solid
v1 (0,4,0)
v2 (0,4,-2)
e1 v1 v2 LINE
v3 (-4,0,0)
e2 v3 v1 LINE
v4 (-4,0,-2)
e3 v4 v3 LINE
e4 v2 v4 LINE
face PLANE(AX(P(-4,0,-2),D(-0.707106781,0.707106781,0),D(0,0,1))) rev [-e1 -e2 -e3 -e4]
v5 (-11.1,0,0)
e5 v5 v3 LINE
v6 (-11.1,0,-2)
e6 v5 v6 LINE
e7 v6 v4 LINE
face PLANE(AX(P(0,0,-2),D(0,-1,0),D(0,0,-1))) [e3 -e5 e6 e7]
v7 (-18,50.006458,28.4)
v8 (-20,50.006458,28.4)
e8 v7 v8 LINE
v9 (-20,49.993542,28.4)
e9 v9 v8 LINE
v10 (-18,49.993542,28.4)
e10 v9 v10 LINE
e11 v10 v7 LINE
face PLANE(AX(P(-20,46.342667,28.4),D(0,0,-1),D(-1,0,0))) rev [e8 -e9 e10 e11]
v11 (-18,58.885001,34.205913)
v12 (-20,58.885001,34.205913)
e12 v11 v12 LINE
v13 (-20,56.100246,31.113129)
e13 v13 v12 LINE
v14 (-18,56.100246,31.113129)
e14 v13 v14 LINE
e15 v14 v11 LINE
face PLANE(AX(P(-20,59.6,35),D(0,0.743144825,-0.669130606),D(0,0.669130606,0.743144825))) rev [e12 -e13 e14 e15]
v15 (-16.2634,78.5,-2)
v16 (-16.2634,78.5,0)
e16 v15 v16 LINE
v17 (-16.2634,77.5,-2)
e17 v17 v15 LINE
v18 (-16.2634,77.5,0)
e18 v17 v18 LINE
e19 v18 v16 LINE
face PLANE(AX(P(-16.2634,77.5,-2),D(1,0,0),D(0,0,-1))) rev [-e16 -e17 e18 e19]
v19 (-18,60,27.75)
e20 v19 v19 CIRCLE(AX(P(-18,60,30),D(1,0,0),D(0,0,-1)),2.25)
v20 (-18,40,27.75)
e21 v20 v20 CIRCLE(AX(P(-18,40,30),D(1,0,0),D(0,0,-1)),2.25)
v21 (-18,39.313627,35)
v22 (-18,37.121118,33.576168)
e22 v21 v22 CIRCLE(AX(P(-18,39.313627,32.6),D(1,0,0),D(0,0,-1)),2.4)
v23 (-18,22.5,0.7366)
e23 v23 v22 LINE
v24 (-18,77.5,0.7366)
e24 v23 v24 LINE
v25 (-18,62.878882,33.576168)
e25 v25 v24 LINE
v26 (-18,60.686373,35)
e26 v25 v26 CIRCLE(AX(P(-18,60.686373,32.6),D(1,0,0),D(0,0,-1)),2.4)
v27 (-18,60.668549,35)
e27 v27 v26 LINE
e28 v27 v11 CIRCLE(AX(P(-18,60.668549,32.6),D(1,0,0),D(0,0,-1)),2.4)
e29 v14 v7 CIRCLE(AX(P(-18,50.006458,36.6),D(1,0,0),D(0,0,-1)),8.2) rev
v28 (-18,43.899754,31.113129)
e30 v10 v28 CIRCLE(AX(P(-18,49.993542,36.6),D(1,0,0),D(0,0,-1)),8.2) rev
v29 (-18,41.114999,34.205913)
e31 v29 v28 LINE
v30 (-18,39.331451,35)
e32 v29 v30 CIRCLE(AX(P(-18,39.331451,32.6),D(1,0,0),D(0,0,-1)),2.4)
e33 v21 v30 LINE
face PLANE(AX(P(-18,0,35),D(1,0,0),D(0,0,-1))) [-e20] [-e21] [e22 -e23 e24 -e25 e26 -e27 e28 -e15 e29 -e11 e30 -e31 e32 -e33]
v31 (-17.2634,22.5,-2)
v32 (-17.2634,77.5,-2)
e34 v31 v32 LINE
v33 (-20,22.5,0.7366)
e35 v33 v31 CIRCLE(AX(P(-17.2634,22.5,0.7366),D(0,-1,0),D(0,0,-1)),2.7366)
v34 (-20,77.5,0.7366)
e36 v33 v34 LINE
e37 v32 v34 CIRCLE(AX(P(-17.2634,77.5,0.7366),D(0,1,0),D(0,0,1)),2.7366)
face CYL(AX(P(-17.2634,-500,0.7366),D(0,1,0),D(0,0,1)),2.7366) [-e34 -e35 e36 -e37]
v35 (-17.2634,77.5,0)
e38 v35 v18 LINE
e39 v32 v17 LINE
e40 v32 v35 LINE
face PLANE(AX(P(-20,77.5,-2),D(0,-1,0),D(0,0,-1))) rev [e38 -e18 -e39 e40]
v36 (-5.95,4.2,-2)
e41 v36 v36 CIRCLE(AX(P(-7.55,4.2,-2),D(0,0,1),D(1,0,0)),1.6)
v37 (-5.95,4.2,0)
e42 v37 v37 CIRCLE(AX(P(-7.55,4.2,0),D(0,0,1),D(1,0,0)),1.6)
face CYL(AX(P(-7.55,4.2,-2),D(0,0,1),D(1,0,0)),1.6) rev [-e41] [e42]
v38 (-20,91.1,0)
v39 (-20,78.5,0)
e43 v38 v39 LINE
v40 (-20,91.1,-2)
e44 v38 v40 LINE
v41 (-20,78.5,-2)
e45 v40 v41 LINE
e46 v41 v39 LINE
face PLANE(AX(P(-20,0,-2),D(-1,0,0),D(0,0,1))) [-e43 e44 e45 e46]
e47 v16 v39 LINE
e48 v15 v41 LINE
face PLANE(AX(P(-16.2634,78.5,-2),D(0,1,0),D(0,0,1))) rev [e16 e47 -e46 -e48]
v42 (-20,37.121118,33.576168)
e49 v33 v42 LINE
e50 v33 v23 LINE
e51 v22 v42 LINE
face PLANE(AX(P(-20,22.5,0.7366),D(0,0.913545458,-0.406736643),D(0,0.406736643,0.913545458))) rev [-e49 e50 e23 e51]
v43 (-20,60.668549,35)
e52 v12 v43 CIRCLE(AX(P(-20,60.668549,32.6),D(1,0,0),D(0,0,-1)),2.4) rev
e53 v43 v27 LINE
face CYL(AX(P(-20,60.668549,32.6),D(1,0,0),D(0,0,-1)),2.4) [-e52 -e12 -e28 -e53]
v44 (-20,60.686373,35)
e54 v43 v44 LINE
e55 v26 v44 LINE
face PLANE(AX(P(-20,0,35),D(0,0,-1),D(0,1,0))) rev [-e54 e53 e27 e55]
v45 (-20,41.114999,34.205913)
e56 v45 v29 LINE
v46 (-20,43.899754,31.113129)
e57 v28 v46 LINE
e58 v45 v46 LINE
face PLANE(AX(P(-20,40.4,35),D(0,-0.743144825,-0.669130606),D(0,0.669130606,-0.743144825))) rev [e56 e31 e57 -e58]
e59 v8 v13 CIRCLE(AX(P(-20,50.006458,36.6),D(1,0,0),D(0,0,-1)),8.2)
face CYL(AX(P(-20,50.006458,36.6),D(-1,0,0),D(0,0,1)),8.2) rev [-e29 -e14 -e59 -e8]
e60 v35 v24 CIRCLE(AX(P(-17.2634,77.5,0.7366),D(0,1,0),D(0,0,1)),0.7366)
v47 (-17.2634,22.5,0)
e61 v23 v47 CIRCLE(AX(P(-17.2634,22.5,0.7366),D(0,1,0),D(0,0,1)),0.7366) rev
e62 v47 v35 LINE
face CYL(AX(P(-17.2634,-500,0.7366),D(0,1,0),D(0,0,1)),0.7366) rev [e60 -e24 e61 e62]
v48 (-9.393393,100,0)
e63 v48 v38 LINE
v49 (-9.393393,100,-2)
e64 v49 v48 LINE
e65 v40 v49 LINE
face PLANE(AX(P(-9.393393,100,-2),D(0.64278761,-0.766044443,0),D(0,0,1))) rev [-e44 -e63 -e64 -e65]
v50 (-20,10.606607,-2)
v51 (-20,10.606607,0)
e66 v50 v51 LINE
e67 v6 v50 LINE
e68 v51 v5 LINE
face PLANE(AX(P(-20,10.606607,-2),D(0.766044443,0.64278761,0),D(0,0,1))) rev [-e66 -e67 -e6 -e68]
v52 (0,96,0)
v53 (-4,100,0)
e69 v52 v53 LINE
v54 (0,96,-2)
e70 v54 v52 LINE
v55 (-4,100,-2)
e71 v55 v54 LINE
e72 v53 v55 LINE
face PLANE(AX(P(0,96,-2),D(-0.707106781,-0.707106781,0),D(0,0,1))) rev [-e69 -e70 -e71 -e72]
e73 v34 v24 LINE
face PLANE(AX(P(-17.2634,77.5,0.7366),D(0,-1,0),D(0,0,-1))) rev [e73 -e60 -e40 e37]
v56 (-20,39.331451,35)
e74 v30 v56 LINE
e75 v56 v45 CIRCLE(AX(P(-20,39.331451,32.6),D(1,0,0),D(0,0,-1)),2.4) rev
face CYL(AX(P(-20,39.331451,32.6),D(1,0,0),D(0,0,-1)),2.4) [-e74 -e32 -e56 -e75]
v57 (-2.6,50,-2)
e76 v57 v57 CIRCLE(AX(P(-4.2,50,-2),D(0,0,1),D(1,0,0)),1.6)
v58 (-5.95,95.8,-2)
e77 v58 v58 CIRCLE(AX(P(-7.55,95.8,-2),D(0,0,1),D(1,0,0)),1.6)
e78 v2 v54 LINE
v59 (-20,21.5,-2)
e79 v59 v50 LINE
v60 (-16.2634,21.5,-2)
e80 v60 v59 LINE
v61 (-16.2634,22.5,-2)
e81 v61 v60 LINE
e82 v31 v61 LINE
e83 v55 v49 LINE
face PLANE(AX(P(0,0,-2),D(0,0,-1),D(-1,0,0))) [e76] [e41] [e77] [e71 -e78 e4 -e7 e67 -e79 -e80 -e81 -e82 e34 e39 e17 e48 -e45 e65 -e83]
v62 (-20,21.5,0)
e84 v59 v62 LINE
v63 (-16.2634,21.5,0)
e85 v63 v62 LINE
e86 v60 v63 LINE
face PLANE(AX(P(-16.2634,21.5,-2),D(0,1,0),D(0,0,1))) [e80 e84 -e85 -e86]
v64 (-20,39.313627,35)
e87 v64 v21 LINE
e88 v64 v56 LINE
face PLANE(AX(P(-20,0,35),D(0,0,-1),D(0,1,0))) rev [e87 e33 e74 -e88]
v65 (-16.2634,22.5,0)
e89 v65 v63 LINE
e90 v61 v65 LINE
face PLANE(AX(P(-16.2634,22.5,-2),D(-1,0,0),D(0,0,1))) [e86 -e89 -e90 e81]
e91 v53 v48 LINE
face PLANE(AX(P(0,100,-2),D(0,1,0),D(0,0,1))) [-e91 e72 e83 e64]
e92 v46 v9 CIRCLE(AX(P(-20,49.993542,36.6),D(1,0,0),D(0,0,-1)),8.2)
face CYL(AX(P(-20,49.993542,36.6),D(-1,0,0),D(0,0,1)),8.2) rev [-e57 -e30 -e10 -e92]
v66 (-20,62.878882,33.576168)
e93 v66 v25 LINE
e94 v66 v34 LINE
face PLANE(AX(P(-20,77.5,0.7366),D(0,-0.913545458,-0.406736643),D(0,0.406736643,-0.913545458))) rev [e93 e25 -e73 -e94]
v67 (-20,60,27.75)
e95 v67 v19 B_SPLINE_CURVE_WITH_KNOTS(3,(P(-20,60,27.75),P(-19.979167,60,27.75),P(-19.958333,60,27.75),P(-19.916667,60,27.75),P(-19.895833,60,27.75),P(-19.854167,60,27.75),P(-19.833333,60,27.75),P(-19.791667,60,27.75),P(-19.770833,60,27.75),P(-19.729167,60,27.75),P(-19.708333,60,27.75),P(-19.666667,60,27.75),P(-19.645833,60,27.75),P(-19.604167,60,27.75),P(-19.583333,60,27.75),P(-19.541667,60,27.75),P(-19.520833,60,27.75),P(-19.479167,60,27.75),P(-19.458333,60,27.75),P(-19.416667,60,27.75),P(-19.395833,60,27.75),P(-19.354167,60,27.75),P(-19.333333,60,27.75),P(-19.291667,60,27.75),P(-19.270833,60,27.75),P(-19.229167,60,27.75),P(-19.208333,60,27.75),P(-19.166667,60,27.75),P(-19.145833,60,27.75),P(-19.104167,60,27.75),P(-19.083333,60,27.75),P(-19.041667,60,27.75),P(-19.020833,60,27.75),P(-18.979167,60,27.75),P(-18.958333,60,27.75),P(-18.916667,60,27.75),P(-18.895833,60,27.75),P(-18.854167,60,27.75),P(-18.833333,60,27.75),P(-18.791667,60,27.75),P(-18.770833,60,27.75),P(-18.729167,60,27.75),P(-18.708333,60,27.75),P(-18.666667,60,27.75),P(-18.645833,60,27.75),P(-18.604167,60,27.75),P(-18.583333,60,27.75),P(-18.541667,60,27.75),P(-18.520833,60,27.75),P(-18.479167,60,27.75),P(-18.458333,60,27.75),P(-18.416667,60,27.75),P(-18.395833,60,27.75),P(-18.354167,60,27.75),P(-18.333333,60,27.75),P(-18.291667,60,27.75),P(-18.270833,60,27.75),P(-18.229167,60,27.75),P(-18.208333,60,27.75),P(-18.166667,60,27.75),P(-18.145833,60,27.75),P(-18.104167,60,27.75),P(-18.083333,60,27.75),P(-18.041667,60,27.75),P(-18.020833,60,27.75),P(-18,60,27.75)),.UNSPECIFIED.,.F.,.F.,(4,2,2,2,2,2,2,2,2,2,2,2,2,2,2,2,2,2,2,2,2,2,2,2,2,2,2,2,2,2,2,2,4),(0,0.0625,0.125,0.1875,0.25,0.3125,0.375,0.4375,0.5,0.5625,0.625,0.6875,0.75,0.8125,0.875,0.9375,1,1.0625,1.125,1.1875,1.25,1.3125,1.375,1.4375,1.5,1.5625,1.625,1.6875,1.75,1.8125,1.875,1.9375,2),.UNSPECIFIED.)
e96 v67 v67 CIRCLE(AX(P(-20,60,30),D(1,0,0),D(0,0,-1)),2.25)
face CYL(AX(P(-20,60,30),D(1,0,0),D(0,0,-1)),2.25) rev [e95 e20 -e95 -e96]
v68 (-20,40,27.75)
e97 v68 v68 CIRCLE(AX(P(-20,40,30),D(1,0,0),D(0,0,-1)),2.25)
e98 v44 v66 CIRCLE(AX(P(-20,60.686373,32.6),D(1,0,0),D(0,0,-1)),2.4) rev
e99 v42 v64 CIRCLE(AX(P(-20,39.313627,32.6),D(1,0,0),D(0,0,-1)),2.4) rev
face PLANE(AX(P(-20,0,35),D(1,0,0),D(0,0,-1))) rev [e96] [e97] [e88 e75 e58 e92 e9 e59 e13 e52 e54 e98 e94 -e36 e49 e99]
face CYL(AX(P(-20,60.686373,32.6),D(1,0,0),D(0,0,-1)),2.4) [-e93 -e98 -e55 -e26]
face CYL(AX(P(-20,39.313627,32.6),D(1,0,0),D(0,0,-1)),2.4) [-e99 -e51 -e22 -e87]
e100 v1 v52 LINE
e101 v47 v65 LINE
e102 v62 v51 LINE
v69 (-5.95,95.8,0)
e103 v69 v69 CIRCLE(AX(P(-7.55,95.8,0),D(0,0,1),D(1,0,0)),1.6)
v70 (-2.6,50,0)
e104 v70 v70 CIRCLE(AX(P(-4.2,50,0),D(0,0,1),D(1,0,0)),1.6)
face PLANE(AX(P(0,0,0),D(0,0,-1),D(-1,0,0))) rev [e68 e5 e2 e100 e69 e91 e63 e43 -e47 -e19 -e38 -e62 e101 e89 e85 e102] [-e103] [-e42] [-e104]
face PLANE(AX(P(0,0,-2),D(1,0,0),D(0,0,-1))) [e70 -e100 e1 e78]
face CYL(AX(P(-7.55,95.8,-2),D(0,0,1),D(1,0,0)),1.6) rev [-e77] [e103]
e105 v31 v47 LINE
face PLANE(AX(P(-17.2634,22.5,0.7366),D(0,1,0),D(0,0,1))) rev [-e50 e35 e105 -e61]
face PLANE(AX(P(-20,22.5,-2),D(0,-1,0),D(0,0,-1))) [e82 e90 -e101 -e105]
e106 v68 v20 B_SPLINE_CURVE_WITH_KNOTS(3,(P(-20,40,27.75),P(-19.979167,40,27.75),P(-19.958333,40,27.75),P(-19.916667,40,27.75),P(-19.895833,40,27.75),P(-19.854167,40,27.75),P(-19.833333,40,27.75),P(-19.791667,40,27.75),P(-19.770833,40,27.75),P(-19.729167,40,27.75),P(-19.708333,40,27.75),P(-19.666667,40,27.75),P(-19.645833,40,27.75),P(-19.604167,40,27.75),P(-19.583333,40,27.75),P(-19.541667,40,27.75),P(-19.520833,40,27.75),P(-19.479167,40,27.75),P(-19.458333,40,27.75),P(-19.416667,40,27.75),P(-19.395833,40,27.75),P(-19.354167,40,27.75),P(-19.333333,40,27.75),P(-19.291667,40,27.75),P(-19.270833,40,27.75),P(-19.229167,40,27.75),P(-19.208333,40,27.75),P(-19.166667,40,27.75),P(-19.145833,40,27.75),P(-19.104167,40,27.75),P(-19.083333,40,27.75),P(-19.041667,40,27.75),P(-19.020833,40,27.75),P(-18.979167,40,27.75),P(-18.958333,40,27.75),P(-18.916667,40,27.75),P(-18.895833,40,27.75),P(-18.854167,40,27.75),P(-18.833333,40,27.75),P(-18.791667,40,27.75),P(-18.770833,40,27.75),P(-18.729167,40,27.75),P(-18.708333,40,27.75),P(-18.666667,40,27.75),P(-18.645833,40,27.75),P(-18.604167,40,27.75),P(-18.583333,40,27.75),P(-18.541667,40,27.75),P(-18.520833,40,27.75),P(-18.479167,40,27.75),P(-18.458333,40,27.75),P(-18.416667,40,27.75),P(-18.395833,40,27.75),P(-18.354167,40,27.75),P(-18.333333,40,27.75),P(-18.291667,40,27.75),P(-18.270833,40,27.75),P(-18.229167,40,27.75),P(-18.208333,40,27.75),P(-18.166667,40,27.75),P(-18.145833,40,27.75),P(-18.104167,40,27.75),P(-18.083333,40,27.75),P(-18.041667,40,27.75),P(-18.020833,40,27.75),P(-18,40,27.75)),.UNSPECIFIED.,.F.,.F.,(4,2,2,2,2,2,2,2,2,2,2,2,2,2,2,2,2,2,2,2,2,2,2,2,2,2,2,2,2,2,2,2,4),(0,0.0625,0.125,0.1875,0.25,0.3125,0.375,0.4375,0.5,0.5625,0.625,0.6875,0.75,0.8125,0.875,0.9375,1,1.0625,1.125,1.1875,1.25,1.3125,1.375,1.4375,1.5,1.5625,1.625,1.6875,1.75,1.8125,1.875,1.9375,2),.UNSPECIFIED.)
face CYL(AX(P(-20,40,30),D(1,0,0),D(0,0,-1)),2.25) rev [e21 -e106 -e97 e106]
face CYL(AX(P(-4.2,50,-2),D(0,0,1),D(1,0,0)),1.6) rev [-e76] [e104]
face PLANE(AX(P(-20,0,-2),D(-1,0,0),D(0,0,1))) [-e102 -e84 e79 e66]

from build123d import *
from OCP.BRepFilletAPI import BRepFilletAPI_MakeChamfer

# Parameters (mm, degrees)
SKETCH1_W             = 100
SKETCH1_H             = 20
SKETCH1_R             = 1.6
BASE_FLANGE2_DEPTH    = 2
MITER_START           = 21.5
MITER_FLANGE1_DEPTH   = 57
MITER_FLANGE1_2_DEPTH = 1
MITER_START_2         = 77.5
MITER_FLANGE1_3_DEPTH = 1
MITER_START_3         = 22.5
MITER_FLANGE1_4_DEPTH = 55
CUT_EXTRUDE2_DEPTH    = 108.466273779
FILLET1_R             = 2.4
FILLET2_R             = 8.2
SKETCH8_R             = 2.25
CUT_EXTRUDE1_DEPTH    = 108.466273779
CHAMFER1_SIZE         = 8.9
CHAMFER1_SIZE2        = 10.606606974
CHAMFER2_SIZE         = 4


# Read off the part's stored shape, not the designer's step: Miter Flange1
# Sheet-metal steps are written as plain solids
with BuildPart() as part:
    # Sketch1 → Base-Flange2 (new body)
    with BuildSketch(Plane(origin=(0, 0, 0), x_dir=(0, 1, 0), z_dir=(0, 0, 1))):
        with Locations((50, 10)):
            Rectangle(SKETCH1_W, SKETCH1_H)
        with Locations(Location((50, 4.2, 0), (0, 0, 270))):
            Circle(SKETCH1_R, mode=Mode.SUBTRACT)
        with Locations(Location((4.2, 7.55, 0), (0, 0, 270))):
            Circle(SKETCH1_R, mode=Mode.SUBTRACT)
        with Locations(Location((95.8, 7.55, 0), (0, 0, 270))):
            Circle(SKETCH1_R, mode=Mode.SUBTRACT)
    extrude(amount=-BASE_FLANGE2_DEPTH)

    # Miter Flange1 outline → Miter Flange1 (cut)
    with BuildSketch(Plane(origin=(0, 0, 0), x_dir=(1, 0, 0), z_dir=(0, 1, 0)).offset(MITER_START)):
        with BuildLine():
            Line((-20, 0), (-19.899002398, 0))
            ThreePointArc((-19.899002398, 0), (-18.917667209, 1.443395312), (-17.2634, 2))
            Line((-17.2634, 2), (-20, 2))
            Line((-20, 2), (-20, 0))
        make_face()
    extrude(amount=MITER_FLANGE1_DEPTH, mode=Mode.SUBTRACT)

    # Miter Flange1 2 outline → Miter Flange1 2 (cut)
    with BuildSketch(Plane(origin=(0, 0, 0), x_dir=(1, 0, 0), z_dir=(0, 1, 0)).offset(MITER_START)):
        with BuildLine():
            ThreePointArc((-17.2634, 2), (-18.917667209, 1.443395312), (-19.899002398, 0))
            Line((-19.899002398, 0), (-16.2634, 0))
            Line((-16.2634, 0), (-16.2634, 2))
            Line((-16.2634, 2), (-17.2634, 2))
        make_face()
    extrude(amount=MITER_FLANGE1_2_DEPTH, mode=Mode.SUBTRACT)

    # Miter Flange1 3 outline → Miter Flange1 3 (cut)
    with BuildSketch(Plane(origin=(0, 0, 0), x_dir=(1, 0, 0), z_dir=(0, 1, 0)).offset(MITER_START_2)):
        with BuildLine():
            ThreePointArc((-17.2634, 2), (-18.917667209, 1.443395312), (-19.899002398, 0))
            Line((-19.899002398, 0), (-16.2634, 0))
            Line((-16.2634, 0), (-16.2634, 2))
            Line((-16.2634, 2), (-17.2634, 2))
        make_face()
    extrude(amount=MITER_FLANGE1_3_DEPTH, mode=Mode.SUBTRACT)

    # Miter Flange1 4 outline → Miter Flange1 4 (add)
    with BuildSketch(Plane(origin=(0, 0, 0), x_dir=(1, 0, 0), z_dir=(0, 1, 0)).offset(MITER_START_3)):
        with BuildLine():
            Line((-20, -0.7366), (-20, -35))
            Line((-20, -35), (-18, -35))
            Line((-18, -35), (-18, -0.7366))
            ThreePointArc((-18, -0.7366), (-17.784254855, -0.215745145), (-17.2634, 0))
            Line((-17.2634, 0), (-19.899002398, 0))
            ThreePointArc((-19.899002398, 0), (-19.974633029, -0.364854094), (-20, -0.7366))
        make_face()
    extrude(amount=MITER_FLANGE1_4_DEPTH)

    # Sketch9 → Cut-Extrude2 (cut, through all)
    with BuildSketch(Plane.YZ.offset(-18)):
        Polygon((22.5, 0.7366), (37.755048536, 35), (22.5, 35), align=None)
        Polygon((62.244951464, 35), (77.5, 35), (77.5, 0.7366), align=None)
        Polygon((40.4, 35), (59.6, 35), (53.657333308, 28.4), (46.342666692, 28.4), align=None)
    extrude(amount=-CUT_EXTRUDE2_DEPTH, mode=Mode.SUBTRACT)

    # Fillet1
    fillet1_edges = [part.edges().sort_by_distance(p)[0] for p in [
        (-19, 40.4, 35),
        (-19, 59.6, 35),
        (-19, 37.755048536, 35),
        (-19, 62.244951464, 35),
    ]]
    fillet(fillet1_edges, radius=FILLET1_R)

    # Fillet2
    fillet2_edges = [part.edges().sort_by_distance(p)[0] for p in [
        (-19, 53.657333308, 28.4),
        (-19, 46.342666692, 28.4),
    ]]
    fillet(fillet2_edges, radius=FILLET2_R)

    # Sketch8 → Cut-Extrude1 (cut, through all)
    with BuildSketch(Plane.YZ.offset(-18)):
        with Locations(Location((40, 30, 0), (0, 0, 270))):
            Circle(SKETCH8_R)
        with Locations(Location((60, 30, 0), (0, 0, 270))):
            Circle(SKETCH8_R)
    extrude(amount=-CUT_EXTRUDE1_DEPTH, mode=Mode.SUBTRACT)

    # Chamfer1: one chamfer whose edges measure the first distance from different faces: ONE call of the kernel's chamfer builder (chamfer() names one face for all edges)
    chamfer1_edges_1 = [part.edges().sort_by_distance(p)[0] for p in [
        (-20, 0, -1),
    ]]
    chamfer1_side_1 = [part.faces().sort_by_distance(p)[0] for p in [
        (-10, 0, -1),
    ]]
    chamfer1_edges_2 = [part.edges().sort_by_distance(p)[0] for p in [
        (-20, 100, -1),
    ]]
    chamfer1_side_2 = [part.faces().sort_by_distance(p)[0] for p in [
        (-20, 89.25, -1),
    ]]
    chamfer1 = BRepFilletAPI_MakeChamfer(part.part.solid().wrapped)
    for e in chamfer1_edges_1:
        chamfer1.Add(CHAMFER1_SIZE, CHAMFER1_SIZE2, e.wrapped, chamfer1_side_1[0].wrapped)  # the first distance lies on this face
    for e in chamfer1_edges_2:
        chamfer1.Add(CHAMFER1_SIZE, CHAMFER1_SIZE2, e.wrapped, chamfer1_side_2[0].wrapped)  # the first distance lies on this face
    add(Compound.cast(chamfer1.Shape()), mode=Mode.REPLACE)

    # Chamfer2
    chamfer2_edges = [part.edges().sort_by_distance(p)[0] for p in [
        (0, 100, -1),
        (0, 0, -1),
    ]]
    chamfer(chamfer2_edges, length=CHAMFER2_SIZE)


solid = part.part
